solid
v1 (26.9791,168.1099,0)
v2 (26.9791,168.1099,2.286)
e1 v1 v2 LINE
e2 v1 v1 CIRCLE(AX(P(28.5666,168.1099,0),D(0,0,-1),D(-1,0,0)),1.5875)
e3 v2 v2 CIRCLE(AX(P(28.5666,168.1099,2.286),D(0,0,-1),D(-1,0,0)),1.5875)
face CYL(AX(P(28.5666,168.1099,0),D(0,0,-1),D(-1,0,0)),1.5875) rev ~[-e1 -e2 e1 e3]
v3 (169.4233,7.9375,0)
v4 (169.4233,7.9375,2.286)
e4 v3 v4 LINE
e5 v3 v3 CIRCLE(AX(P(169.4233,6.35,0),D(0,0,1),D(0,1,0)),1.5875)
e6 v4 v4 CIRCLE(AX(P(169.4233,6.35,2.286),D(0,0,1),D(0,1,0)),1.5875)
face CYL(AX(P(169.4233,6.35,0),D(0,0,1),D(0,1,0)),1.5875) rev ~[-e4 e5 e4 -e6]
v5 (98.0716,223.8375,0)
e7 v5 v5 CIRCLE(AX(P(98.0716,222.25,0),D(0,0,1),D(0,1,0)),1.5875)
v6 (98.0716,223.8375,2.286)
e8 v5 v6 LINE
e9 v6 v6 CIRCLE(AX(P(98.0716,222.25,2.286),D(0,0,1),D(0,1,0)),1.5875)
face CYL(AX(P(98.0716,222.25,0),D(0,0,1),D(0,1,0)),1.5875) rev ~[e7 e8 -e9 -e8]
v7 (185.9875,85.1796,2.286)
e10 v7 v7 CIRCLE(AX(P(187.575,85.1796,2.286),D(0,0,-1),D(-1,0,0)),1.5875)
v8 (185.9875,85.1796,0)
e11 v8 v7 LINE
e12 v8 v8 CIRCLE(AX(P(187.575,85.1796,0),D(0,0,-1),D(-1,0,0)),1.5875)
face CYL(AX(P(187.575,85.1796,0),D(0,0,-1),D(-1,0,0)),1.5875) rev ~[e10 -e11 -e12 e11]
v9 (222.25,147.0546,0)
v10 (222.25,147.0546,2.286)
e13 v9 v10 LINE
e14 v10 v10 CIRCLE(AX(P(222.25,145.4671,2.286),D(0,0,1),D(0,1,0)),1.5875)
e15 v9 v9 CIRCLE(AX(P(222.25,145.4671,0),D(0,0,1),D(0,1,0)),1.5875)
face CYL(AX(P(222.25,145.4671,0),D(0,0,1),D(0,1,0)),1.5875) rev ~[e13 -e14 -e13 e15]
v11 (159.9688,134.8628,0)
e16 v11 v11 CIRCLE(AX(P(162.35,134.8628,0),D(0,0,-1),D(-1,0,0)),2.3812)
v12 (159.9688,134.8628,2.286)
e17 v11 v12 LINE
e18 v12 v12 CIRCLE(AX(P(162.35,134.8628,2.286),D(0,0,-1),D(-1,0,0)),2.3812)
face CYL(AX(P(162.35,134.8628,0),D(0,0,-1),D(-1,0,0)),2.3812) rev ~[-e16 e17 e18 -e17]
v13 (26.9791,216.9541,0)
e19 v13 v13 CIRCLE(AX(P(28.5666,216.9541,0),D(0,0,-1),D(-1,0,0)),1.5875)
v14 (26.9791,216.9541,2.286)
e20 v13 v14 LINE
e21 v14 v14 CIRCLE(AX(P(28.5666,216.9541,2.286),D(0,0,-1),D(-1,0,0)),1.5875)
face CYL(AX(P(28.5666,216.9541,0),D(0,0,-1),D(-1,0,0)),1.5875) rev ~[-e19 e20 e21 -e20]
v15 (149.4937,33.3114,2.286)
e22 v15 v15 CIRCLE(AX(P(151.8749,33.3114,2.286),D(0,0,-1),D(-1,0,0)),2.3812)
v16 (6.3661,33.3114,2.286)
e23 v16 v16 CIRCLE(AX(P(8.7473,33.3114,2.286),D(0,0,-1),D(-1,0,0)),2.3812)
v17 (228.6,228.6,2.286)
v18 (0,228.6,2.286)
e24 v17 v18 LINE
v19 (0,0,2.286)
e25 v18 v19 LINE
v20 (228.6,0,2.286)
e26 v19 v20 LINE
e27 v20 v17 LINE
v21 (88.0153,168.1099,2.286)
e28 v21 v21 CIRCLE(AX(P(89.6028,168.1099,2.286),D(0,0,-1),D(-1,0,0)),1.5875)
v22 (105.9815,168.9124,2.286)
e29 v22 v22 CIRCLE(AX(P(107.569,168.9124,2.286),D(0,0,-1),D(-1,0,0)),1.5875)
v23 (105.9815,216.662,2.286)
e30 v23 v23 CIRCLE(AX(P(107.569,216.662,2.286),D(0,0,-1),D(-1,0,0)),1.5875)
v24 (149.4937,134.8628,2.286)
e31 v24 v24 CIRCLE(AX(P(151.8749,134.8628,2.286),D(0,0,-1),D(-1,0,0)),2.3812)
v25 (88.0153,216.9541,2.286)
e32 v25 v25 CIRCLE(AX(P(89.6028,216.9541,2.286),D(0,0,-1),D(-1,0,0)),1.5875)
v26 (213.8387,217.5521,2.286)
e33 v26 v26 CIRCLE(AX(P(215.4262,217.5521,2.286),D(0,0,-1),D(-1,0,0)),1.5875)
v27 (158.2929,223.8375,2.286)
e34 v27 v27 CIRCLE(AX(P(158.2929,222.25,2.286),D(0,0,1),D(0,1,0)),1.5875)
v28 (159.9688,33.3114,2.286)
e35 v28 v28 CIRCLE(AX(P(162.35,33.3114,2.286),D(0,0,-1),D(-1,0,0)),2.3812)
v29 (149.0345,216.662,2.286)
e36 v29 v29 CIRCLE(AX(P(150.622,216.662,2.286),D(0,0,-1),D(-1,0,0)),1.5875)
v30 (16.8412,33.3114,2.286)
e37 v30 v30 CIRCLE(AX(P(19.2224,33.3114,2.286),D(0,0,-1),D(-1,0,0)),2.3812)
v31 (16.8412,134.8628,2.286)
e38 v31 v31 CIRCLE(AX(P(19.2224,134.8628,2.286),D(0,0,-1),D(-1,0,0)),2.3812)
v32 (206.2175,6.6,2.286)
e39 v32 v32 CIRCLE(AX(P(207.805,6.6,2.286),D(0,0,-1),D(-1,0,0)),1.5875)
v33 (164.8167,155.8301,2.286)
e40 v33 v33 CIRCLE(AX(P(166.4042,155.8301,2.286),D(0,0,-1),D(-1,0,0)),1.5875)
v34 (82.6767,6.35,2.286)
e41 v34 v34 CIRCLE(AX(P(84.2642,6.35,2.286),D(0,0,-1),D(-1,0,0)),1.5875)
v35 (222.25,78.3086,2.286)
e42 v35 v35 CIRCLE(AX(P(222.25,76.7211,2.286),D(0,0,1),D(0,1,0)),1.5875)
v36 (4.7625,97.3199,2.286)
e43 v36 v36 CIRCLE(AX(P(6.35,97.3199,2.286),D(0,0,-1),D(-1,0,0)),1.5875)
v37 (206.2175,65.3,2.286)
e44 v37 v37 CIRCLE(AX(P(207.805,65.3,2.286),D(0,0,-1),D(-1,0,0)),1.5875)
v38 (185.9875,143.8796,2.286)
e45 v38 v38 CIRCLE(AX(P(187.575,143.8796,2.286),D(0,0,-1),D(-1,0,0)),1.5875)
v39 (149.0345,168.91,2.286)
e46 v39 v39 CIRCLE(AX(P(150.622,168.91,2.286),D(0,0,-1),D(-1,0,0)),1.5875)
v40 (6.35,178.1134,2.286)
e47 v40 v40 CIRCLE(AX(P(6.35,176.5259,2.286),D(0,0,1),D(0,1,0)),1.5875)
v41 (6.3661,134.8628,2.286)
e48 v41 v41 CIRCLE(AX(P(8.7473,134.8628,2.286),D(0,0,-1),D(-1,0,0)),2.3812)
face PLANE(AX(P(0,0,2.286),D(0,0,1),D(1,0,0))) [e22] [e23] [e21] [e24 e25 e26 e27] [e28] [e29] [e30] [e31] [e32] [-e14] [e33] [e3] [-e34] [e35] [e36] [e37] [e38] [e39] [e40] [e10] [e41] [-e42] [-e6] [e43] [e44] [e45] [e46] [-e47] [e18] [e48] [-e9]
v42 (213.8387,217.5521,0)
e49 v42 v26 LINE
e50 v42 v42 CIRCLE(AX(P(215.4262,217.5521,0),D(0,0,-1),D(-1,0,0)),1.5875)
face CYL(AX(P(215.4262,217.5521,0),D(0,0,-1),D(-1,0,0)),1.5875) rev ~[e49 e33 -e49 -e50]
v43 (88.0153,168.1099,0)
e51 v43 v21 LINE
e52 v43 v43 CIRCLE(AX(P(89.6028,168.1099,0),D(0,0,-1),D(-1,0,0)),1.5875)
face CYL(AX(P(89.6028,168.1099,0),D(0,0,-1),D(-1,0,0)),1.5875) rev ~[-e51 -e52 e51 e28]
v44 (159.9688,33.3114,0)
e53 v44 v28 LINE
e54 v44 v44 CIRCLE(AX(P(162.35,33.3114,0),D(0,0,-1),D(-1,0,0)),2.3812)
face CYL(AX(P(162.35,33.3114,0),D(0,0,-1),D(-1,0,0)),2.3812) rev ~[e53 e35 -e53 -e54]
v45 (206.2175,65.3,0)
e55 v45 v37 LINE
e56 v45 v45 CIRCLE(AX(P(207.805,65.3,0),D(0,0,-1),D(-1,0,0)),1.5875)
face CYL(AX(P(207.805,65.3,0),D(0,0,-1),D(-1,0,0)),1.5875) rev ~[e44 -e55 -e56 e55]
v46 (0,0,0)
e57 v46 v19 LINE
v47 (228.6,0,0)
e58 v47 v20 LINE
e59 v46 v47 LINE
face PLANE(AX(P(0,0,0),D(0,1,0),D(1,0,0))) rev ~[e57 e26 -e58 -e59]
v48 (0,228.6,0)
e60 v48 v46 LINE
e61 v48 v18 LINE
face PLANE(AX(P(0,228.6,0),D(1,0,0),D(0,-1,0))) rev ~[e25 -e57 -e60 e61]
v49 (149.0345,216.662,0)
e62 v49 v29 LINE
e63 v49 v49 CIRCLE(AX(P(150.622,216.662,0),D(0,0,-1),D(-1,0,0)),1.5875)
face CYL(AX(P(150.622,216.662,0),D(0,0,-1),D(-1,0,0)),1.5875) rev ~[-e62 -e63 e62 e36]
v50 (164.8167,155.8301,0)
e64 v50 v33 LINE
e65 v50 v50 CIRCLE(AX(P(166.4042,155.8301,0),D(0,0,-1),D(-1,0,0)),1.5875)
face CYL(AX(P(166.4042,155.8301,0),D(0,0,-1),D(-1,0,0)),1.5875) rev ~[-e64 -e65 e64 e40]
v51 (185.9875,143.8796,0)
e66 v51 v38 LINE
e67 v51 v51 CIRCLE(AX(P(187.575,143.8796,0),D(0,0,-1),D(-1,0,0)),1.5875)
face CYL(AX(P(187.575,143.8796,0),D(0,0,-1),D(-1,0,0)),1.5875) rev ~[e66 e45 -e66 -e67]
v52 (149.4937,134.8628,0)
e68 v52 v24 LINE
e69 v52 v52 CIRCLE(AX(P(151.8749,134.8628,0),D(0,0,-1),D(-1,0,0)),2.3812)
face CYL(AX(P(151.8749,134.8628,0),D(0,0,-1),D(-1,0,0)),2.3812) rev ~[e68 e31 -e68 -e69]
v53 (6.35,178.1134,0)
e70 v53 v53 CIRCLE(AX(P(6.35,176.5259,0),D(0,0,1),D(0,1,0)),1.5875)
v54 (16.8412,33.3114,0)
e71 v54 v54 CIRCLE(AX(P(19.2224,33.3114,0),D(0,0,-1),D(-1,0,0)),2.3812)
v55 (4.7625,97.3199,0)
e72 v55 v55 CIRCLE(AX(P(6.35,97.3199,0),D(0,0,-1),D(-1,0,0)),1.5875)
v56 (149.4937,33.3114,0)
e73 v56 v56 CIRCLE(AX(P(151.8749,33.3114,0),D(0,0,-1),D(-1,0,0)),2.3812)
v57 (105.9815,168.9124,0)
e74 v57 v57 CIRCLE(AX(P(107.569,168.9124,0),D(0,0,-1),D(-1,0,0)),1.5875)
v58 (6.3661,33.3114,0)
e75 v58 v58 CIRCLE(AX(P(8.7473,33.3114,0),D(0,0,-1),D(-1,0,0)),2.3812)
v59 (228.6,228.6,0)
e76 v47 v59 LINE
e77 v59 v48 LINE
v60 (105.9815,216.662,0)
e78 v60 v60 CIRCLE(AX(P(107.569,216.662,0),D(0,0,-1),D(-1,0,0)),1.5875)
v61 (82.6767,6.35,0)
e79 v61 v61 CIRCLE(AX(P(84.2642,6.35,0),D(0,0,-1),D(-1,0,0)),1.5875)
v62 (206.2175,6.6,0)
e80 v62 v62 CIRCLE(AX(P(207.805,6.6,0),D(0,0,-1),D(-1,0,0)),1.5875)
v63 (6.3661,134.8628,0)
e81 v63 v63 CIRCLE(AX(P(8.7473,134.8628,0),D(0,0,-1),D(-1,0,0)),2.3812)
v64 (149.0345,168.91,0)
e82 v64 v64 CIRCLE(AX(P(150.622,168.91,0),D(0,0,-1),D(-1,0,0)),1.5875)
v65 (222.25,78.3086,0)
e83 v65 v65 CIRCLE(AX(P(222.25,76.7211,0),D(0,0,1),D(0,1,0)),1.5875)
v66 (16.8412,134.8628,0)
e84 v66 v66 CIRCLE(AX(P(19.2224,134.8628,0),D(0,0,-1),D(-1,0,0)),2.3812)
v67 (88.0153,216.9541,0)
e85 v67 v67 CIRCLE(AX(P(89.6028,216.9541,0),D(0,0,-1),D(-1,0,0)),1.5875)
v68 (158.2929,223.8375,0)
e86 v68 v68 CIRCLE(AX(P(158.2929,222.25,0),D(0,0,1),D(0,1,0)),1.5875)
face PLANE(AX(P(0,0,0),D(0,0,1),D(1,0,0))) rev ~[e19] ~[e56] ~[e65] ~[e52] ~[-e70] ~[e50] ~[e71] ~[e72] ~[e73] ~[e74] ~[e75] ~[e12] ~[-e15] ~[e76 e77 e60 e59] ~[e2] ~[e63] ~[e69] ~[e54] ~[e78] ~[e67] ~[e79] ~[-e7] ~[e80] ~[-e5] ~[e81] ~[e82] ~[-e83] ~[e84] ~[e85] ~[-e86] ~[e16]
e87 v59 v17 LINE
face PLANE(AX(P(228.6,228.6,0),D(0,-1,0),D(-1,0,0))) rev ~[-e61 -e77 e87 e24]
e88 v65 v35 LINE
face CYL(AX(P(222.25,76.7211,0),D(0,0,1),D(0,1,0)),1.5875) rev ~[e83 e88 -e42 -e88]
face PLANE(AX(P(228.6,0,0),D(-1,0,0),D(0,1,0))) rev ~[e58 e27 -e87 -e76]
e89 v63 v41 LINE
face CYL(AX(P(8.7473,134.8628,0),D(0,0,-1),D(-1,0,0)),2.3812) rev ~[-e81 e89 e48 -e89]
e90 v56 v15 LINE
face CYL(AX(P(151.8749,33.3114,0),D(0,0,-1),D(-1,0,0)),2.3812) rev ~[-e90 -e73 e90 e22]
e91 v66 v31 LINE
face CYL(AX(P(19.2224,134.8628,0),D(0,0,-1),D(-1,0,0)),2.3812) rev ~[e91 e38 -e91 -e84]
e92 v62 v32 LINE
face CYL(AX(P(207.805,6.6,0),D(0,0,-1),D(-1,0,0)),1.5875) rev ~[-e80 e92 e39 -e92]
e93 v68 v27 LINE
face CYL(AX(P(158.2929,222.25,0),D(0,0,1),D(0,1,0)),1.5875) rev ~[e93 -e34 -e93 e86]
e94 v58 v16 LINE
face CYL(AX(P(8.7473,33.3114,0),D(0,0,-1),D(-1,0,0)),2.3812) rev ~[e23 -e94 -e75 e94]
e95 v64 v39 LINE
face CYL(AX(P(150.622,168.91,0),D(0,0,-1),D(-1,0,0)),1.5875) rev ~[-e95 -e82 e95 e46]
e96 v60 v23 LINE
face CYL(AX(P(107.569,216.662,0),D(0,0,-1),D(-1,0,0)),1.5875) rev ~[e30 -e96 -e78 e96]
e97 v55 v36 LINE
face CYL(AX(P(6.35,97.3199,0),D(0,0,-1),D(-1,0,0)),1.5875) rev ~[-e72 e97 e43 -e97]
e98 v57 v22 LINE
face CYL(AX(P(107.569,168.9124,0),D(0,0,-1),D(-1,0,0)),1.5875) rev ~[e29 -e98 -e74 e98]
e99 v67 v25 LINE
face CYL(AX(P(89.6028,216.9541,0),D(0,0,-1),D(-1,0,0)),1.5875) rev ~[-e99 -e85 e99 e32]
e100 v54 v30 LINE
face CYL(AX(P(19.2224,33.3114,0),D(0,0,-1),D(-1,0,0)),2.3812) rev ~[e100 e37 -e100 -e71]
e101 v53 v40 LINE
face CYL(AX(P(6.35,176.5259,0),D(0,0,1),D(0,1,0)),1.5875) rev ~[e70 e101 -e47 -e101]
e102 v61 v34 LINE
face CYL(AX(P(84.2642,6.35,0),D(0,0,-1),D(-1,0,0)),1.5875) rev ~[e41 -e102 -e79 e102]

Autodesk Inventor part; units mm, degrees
ref_plane "YZ Plane" through (0, 0, 0) normal (1, 0, 0) x (0, 1, 0)
ref_plane "XZ Plane" through (0, 0, 0) normal (0, 1, 0) x (-1, 0, 0)
ref_plane "XY Plane" through (0, 0, 0) normal (0, 0, 1) x (1, 0, 0)
sketch "Sketch1" plane through (0, 0, 0) normal (0, 0, 1) x (1, 0, 0)
  line L0 (0, 0) -> (228.6, 0)
  line L1 (228.6, 0) -> (228.6, 228.6)
  line L2 (228.6, 228.6) -> (0, 228.6)
  line L3 (0, 228.6) -> (0, 0)
  dimension "d0" = 228.6
  dimension "d1" = 228.6
extrude "Plate1" add sketch "Sketch1" along normal blind 2.286
sketch "Sketch2" plane through (0, 0, 0) normal (0, 0, -1) x (-1, 0, 0)
  circle A0 centre (-28.5666, 168.1099) radius 1.8387 projected
  line L0 (-12.7161, 130.0825) -> (-12.7161, 139.643) projected
  line L1 (-12.7161, 130.0825) -> (-15.4564, 130.1971) projected
  line L2 (-15.4564, 130.1971) -> (-15.4564, 139.5284) projected
  line L3 (-12.7161, 139.643) -> (-15.4564, 139.5284) projected
  line L4 (-12.7161, 139.6958) -> (-12.7161, 130.0297) projected
  line L5 (-12.7161, 139.6958) -> (-15.4632, 139.5771) projected
  line L6 (-15.4632, 139.5771) -> (-15.4632, 130.1485) projected
  line L7 (-12.7161, 130.0297) -> (-15.4632, 130.1485) projected
  line L8 (-12.7161, 28.4825) -> (-12.7161, 38.043) projected
  line L9 (-12.7161, 28.4825) -> (-15.4564, 28.5971) projected
  line L10 (-15.4564, 28.5971) -> (-15.4564, 37.9284) projected
  line L11 (-12.7161, 38.043) -> (-15.4564, 37.9284) projected
  line L12 (-12.7161, 38.0958) -> (-12.7161, 28.4297) projected
  line L13 (-12.7161, 38.0958) -> (-15.4632, 37.9771) projected
  line L14 (-15.4632, 37.9771) -> (-15.4632, 28.5485) projected
  line L15 (-12.7161, 28.4297) -> (-15.4632, 28.5485) projected
  line L16 (-158.3812, 38.043) -> (-158.3812, 28.4825) projected
  line L17 (-158.3812, 38.043) -> (-155.6409, 37.9284) projected
  line L18 (-155.6409, 37.9284) -> (-155.6409, 28.5971) projected
  line L19 (-158.3812, 28.4825) -> (-155.6409, 28.5971) projected
  line L20 (-158.3812, 28.4297) -> (-158.3812, 38.0958) projected
  line L21 (-158.3812, 28.4297) -> (-155.6341, 28.5485) projected
  line L22 (-155.6341, 28.5485) -> (-155.6341, 37.9771) projected
  line L23 (-158.3812, 38.0958) -> (-155.6341, 37.9771) projected
  line L24 (-158.3812, 38.043) -> (-158.3812, 28.4825) projected
  line L25 (-158.3812, 38.043) -> (-155.6409, 37.9284) projected
  line L26 (-155.6409, 37.9284) -> (-155.6409, 28.5971) projected
  line L27 (-158.3812, 28.4825) -> (-155.6409, 28.5971) projected
  line L28 (-158.3812, 130.0297) -> (-158.3812, 139.6958) projected
  line L29 (-158.3812, 130.0297) -> (-155.6341, 130.1485) projected
  line L30 (-155.6341, 130.1485) -> (-155.6341, 139.5771) projected
  line L31 (-158.3812, 139.6958) -> (-155.6341, 139.5771) projected
  line L32 (-158.3812, 139.643) -> (-158.3812, 130.0825) projected
  line L33 (-158.3812, 139.643) -> (-155.6409, 139.5284) projected
  line L34 (-155.6409, 139.5284) -> (-155.6409, 130.1971) projected
  line L35 (-158.3812, 130.0825) -> (-155.6409, 130.1971) projected
  circle A1 centre (-207.805, 6.6) radius 2.5 projected
  circle A2 centre (-207.805, 65.3) radius 2.5 projected
  circle A3 centre (-187.575, 85.1796) radius 2.5 projected
  circle A4 centre (-187.575, 143.8796) radius 2.5 projected
  circle A5 centre (-215.4262, 217.5521) radius 2.1789 projected
  circle A6 centre (-166.4042, 155.8301) radius 2.1789 projected
  circle A7 centre (-150.622, 216.662) radius 1.905 projected
  circle A8 centre (-107.569, 216.662) radius 1.905 projected
  circle A9 centre (-107.569, 168.9124) radius 1.905 projected
  circle A10 centre (-150.622, 168.91) radius 1.905 projected
  circle A11 centre (-89.6028, 168.1099) radius 1.8387 projected
  circle A12 centre (-89.6028, 216.9541) radius 1.8387 projected
  circle A13 centre (-28.5666, 216.9541) radius 1.8387 projected
  circle A14 centre (-162.35, 134.8628) radius 2.3812
  circle A15 centre (-207.805, 6.6) radius 1.5875
  circle A16 centre (-207.805, 65.3) radius 1.5875
  circle A17 centre (-187.575, 85.1796) radius 1.5875
  circle A18 centre (-187.575, 143.8796) radius 1.5875
  circle A19 centre (-166.4042, 155.8301) radius 1.5875
  circle A20 centre (-150.622, 168.91) radius 1.5875
  circle A21 centre (-107.569, 168.9124) radius 1.5875
  circle A22 centre (-89.6028, 168.1099) radius 1.5875
  circle A23 centre (-28.5666, 168.1099) radius 1.5875
  circle A24 centre (-28.5666, 216.9541) radius 1.5875
  circle A25 centre (-89.6028, 216.9541) radius 1.5875
  circle A26 centre (-107.569, 216.662) radius 1.5875
  circle A27 centre (-150.622, 216.662) radius 1.5875
  circle A28 centre (-215.4262, 217.5521) radius 1.5875
  circle A29 centre (-151.8749, 134.8628) radius 2.3812
  line L36 (-155.6341, 37.9771) -> (-155.6409, 130.1971) construction
  line L37 (-15.4632, 37.9771) -> (-155.6341, 37.9771) construction
  line L38 (-155.6375, 84.0871) -> (-107.569, 84.0871) construction
  line L39 (-85.5487, 37.9771) -> (-85.5487, 82.6796) construction
  circle A30 centre (-162.35, 33.3114) radius 2.3812
  circle A31 centre (-151.8749, 33.3114) radius 2.3812
  circle A32 centre (-8.7473, 134.8628) radius 2.3812
  circle A33 centre (-19.2224, 134.8628) radius 2.3812
  circle A34 centre (-8.7473, 33.3114) radius 2.3812
  circle A35 centre (-19.2224, 33.3114) radius 2.3812
  dimension "d3" = 4.7625
  dimension "d4" = 3.9688
  dimension "x" = 3.175
  dimension "d6" = 3.175
  dimension "d7" = 3.175
  dimension "d8" = 3.175
  dimension "d9" = 3.175
  dimension "d10" = 3.175
  dimension "d11" = 3.175
  dimension "d12" = 3.175
  dimension "d13" = 3.175
  dimension "d14" = 3.175
  dimension "d15" = 3.175
  dimension "d16" = 3.175
  dimension "d17" = 3.175
  dimension "d18" = 3.175
  dimension "d19" = 4.7625
  dimension "d20" = 3.7592
extrude "Cut1" cut sketch "Sketch2" against normal blind 2.286 contours A14 | A15 | A16 | A17 | A18 | A19 | A20 | A21 | A22 | A23 | A24 | A25 | A26 | A27 | A28 | A29 | A30 | A31 | A32 | A33 | A34 | A35
sketch "Sketch3" plane through (0, 0, 0) normal (0, 0, -1) x (-1, 0, 0)
  circle A0 centre (-187.575, 85.1796) radius 1.5875 projected
  circle A1 centre (-207.805, 6.6) radius 1.5875 projected
  circle A2 centre (-215.4262, 217.5521) radius 1.5875 projected
  circle A3 centre (-107.569, 168.9124) radius 1.5875 projected
  circle A4 centre (-150.622, 216.662) radius 1.5875 projected
  circle A5 centre (-89.6028, 216.9541) radius 1.5875 projected
  circle A6 centre (-28.5666, 168.1099) radius 1.5875 projected
  circle A7 centre (-8.7473, 134.8628) radius 2.3812 projected
  circle A8 centre (-19.2224, 33.3114) radius 2.3812 projected
  circle A9 centre (-162.35, 33.3114) radius 2.3812 projected
  circle A10 centre (-162.35, 134.8628) radius 2.3812 projected
  circle A11 centre (-151.8749, 134.8628) radius 2.3812 projected
  circle A12 centre (-151.8749, 33.3114) radius 2.3812 projected
  circle A13 centre (-8.7473, 33.3114) radius 2.3812 projected
  circle A14 centre (-19.2224, 134.8628) radius 2.3812 projected
  circle A15 centre (-89.6028, 168.1099) radius 1.5875 projected
  circle A16 centre (-28.5666, 216.9541) radius 1.5875 projected
  circle A17 centre (-107.569, 216.662) radius 1.5875 projected
  circle A18 centre (-150.622, 168.91) radius 1.5875 projected
  circle A19 centre (-166.4042, 155.8301) radius 1.5875 projected
  circle A20 centre (-207.805, 65.3) radius 1.5875 projected
  circle A21 centre (-187.575, 143.8796) radius 1.5875 projected
  line L0 (0, 0) -> (-228.6, 0) projected
  line L1 (0, 228.6) -> (0, 0) projected
  line L2 (-228.6, 228.6) -> (0, 228.6) projected
  line L3 (-228.6, 0) -> (-228.6, 228.6) projected
sketch "Sketch4" plane through (0, 0, 0) normal (0, 0, -1) x (-1, 0, 0)
  line L0 (0, 0) -> (-228.6, 0) projected
  line L1 (0, 228.6) -> (0, 0) construction
  line L2 (-228.6, 228.6) -> (0, 228.6) projected
  line L3 (-228.6, 0) -> (-228.6, 228.6) construction
  line L4 (-228.6, 228.6) -> (0, 228.6) projected
  line L5 (0, 222.25) -> (-228.6, 222.25) construction
  line L6 (-228.6, 228.6) -> (-228.6, 0) construction
  line L7 (0, 228.6) -> (-228.6, 228.6) construction
  line L8 (-222.25, 228.6) -> (-222.25, 0) construction
  line L9 (-228.6, 0) -> (0, 0) construction
  line L10 (-228.6, 6.35) -> (0, 6.35) construction
  line L11 (-6.35, 0) -> (-6.35, 228.6) construction
  circle A0 centre (-84.2642, 6.35) radius 1.5875
  circle A1 centre (-6.35, 97.3199) radius 1.5875
  circle A2 centre (-98.0716, 222.25) radius 1.5875
  point P0 (-169.4233, 6.35)
  point P1 (-222.25, 76.7211)
  point P2 (-222.25, 145.4671)
  point P3 (-158.2929, 222.25)
  point P4 (-6.35, 176.5259)
  dimension "d23" = 6.35
  dimension "d24" = 6.35
  dimension "d25" = 6.35
  dimension "d26" = 6.35
  dimension "d34" = 3.175
  dimension "d35" = 3.175
  dimension "d36" = 3.175
hole "Hole1" at (6.35, 176.5259, 0) at (98.0716, 222.25, 0) at (158.2929, 222.25, 0) at (222.25, 145.4671, 0) at (222.25, 76.7211, 0) at (169.4233, 6.35, 0) direction (0, 0, 1) diameter 3.175 end through all
extrude "Cut2" cut sketch "Sketch4" against normal blind 2.286 contours A0
extrude "Cut3" cut sketch "Sketch4" against normal blind 2.286 contours A1
equation "\"d6\" = x"
equation "\"d7\" = x"
equation "\"d8\" = x"
equation "\"d9\" = x"
equation "\"d10\" = x"
equation "\"d11\" = x"
equation "\"d12\" = x"
equation "\"d13\" = x"
equation "\"d14\" = x"
equation "\"d15\" = x"
equation "\"d16\" = x"
equation "\"d17\" = x"
equation "\"d18\" = x"
equation "\"d21\" = Thickness"
equation "\"d32\" = Thickness"
equation "\"d37\" = Thickness"
equation "\"d39\" = Thickness"
equation "\"BendRadius\" = Thickness"
equation "\"BendReliefWidth\" = Thickness"
equation "\"BendReliefDepth\" = 0.5 * Thickness"
equation "\"CornerReliefSize\" = 4 * Thickness"
equation "\"MinimumRemnant\" = 2 * Thickness"
equation "\"TransitionRadius\" = BendRadius"
equation "\"JacobiRadiusSize\" = BendRadius"
equation "\"GapSize\" = Thickness"
equation "\"d2\" = BendRadius"
equation "\"Thickness\" = 2.286"
properties part number "Power Board - Plate B2"
